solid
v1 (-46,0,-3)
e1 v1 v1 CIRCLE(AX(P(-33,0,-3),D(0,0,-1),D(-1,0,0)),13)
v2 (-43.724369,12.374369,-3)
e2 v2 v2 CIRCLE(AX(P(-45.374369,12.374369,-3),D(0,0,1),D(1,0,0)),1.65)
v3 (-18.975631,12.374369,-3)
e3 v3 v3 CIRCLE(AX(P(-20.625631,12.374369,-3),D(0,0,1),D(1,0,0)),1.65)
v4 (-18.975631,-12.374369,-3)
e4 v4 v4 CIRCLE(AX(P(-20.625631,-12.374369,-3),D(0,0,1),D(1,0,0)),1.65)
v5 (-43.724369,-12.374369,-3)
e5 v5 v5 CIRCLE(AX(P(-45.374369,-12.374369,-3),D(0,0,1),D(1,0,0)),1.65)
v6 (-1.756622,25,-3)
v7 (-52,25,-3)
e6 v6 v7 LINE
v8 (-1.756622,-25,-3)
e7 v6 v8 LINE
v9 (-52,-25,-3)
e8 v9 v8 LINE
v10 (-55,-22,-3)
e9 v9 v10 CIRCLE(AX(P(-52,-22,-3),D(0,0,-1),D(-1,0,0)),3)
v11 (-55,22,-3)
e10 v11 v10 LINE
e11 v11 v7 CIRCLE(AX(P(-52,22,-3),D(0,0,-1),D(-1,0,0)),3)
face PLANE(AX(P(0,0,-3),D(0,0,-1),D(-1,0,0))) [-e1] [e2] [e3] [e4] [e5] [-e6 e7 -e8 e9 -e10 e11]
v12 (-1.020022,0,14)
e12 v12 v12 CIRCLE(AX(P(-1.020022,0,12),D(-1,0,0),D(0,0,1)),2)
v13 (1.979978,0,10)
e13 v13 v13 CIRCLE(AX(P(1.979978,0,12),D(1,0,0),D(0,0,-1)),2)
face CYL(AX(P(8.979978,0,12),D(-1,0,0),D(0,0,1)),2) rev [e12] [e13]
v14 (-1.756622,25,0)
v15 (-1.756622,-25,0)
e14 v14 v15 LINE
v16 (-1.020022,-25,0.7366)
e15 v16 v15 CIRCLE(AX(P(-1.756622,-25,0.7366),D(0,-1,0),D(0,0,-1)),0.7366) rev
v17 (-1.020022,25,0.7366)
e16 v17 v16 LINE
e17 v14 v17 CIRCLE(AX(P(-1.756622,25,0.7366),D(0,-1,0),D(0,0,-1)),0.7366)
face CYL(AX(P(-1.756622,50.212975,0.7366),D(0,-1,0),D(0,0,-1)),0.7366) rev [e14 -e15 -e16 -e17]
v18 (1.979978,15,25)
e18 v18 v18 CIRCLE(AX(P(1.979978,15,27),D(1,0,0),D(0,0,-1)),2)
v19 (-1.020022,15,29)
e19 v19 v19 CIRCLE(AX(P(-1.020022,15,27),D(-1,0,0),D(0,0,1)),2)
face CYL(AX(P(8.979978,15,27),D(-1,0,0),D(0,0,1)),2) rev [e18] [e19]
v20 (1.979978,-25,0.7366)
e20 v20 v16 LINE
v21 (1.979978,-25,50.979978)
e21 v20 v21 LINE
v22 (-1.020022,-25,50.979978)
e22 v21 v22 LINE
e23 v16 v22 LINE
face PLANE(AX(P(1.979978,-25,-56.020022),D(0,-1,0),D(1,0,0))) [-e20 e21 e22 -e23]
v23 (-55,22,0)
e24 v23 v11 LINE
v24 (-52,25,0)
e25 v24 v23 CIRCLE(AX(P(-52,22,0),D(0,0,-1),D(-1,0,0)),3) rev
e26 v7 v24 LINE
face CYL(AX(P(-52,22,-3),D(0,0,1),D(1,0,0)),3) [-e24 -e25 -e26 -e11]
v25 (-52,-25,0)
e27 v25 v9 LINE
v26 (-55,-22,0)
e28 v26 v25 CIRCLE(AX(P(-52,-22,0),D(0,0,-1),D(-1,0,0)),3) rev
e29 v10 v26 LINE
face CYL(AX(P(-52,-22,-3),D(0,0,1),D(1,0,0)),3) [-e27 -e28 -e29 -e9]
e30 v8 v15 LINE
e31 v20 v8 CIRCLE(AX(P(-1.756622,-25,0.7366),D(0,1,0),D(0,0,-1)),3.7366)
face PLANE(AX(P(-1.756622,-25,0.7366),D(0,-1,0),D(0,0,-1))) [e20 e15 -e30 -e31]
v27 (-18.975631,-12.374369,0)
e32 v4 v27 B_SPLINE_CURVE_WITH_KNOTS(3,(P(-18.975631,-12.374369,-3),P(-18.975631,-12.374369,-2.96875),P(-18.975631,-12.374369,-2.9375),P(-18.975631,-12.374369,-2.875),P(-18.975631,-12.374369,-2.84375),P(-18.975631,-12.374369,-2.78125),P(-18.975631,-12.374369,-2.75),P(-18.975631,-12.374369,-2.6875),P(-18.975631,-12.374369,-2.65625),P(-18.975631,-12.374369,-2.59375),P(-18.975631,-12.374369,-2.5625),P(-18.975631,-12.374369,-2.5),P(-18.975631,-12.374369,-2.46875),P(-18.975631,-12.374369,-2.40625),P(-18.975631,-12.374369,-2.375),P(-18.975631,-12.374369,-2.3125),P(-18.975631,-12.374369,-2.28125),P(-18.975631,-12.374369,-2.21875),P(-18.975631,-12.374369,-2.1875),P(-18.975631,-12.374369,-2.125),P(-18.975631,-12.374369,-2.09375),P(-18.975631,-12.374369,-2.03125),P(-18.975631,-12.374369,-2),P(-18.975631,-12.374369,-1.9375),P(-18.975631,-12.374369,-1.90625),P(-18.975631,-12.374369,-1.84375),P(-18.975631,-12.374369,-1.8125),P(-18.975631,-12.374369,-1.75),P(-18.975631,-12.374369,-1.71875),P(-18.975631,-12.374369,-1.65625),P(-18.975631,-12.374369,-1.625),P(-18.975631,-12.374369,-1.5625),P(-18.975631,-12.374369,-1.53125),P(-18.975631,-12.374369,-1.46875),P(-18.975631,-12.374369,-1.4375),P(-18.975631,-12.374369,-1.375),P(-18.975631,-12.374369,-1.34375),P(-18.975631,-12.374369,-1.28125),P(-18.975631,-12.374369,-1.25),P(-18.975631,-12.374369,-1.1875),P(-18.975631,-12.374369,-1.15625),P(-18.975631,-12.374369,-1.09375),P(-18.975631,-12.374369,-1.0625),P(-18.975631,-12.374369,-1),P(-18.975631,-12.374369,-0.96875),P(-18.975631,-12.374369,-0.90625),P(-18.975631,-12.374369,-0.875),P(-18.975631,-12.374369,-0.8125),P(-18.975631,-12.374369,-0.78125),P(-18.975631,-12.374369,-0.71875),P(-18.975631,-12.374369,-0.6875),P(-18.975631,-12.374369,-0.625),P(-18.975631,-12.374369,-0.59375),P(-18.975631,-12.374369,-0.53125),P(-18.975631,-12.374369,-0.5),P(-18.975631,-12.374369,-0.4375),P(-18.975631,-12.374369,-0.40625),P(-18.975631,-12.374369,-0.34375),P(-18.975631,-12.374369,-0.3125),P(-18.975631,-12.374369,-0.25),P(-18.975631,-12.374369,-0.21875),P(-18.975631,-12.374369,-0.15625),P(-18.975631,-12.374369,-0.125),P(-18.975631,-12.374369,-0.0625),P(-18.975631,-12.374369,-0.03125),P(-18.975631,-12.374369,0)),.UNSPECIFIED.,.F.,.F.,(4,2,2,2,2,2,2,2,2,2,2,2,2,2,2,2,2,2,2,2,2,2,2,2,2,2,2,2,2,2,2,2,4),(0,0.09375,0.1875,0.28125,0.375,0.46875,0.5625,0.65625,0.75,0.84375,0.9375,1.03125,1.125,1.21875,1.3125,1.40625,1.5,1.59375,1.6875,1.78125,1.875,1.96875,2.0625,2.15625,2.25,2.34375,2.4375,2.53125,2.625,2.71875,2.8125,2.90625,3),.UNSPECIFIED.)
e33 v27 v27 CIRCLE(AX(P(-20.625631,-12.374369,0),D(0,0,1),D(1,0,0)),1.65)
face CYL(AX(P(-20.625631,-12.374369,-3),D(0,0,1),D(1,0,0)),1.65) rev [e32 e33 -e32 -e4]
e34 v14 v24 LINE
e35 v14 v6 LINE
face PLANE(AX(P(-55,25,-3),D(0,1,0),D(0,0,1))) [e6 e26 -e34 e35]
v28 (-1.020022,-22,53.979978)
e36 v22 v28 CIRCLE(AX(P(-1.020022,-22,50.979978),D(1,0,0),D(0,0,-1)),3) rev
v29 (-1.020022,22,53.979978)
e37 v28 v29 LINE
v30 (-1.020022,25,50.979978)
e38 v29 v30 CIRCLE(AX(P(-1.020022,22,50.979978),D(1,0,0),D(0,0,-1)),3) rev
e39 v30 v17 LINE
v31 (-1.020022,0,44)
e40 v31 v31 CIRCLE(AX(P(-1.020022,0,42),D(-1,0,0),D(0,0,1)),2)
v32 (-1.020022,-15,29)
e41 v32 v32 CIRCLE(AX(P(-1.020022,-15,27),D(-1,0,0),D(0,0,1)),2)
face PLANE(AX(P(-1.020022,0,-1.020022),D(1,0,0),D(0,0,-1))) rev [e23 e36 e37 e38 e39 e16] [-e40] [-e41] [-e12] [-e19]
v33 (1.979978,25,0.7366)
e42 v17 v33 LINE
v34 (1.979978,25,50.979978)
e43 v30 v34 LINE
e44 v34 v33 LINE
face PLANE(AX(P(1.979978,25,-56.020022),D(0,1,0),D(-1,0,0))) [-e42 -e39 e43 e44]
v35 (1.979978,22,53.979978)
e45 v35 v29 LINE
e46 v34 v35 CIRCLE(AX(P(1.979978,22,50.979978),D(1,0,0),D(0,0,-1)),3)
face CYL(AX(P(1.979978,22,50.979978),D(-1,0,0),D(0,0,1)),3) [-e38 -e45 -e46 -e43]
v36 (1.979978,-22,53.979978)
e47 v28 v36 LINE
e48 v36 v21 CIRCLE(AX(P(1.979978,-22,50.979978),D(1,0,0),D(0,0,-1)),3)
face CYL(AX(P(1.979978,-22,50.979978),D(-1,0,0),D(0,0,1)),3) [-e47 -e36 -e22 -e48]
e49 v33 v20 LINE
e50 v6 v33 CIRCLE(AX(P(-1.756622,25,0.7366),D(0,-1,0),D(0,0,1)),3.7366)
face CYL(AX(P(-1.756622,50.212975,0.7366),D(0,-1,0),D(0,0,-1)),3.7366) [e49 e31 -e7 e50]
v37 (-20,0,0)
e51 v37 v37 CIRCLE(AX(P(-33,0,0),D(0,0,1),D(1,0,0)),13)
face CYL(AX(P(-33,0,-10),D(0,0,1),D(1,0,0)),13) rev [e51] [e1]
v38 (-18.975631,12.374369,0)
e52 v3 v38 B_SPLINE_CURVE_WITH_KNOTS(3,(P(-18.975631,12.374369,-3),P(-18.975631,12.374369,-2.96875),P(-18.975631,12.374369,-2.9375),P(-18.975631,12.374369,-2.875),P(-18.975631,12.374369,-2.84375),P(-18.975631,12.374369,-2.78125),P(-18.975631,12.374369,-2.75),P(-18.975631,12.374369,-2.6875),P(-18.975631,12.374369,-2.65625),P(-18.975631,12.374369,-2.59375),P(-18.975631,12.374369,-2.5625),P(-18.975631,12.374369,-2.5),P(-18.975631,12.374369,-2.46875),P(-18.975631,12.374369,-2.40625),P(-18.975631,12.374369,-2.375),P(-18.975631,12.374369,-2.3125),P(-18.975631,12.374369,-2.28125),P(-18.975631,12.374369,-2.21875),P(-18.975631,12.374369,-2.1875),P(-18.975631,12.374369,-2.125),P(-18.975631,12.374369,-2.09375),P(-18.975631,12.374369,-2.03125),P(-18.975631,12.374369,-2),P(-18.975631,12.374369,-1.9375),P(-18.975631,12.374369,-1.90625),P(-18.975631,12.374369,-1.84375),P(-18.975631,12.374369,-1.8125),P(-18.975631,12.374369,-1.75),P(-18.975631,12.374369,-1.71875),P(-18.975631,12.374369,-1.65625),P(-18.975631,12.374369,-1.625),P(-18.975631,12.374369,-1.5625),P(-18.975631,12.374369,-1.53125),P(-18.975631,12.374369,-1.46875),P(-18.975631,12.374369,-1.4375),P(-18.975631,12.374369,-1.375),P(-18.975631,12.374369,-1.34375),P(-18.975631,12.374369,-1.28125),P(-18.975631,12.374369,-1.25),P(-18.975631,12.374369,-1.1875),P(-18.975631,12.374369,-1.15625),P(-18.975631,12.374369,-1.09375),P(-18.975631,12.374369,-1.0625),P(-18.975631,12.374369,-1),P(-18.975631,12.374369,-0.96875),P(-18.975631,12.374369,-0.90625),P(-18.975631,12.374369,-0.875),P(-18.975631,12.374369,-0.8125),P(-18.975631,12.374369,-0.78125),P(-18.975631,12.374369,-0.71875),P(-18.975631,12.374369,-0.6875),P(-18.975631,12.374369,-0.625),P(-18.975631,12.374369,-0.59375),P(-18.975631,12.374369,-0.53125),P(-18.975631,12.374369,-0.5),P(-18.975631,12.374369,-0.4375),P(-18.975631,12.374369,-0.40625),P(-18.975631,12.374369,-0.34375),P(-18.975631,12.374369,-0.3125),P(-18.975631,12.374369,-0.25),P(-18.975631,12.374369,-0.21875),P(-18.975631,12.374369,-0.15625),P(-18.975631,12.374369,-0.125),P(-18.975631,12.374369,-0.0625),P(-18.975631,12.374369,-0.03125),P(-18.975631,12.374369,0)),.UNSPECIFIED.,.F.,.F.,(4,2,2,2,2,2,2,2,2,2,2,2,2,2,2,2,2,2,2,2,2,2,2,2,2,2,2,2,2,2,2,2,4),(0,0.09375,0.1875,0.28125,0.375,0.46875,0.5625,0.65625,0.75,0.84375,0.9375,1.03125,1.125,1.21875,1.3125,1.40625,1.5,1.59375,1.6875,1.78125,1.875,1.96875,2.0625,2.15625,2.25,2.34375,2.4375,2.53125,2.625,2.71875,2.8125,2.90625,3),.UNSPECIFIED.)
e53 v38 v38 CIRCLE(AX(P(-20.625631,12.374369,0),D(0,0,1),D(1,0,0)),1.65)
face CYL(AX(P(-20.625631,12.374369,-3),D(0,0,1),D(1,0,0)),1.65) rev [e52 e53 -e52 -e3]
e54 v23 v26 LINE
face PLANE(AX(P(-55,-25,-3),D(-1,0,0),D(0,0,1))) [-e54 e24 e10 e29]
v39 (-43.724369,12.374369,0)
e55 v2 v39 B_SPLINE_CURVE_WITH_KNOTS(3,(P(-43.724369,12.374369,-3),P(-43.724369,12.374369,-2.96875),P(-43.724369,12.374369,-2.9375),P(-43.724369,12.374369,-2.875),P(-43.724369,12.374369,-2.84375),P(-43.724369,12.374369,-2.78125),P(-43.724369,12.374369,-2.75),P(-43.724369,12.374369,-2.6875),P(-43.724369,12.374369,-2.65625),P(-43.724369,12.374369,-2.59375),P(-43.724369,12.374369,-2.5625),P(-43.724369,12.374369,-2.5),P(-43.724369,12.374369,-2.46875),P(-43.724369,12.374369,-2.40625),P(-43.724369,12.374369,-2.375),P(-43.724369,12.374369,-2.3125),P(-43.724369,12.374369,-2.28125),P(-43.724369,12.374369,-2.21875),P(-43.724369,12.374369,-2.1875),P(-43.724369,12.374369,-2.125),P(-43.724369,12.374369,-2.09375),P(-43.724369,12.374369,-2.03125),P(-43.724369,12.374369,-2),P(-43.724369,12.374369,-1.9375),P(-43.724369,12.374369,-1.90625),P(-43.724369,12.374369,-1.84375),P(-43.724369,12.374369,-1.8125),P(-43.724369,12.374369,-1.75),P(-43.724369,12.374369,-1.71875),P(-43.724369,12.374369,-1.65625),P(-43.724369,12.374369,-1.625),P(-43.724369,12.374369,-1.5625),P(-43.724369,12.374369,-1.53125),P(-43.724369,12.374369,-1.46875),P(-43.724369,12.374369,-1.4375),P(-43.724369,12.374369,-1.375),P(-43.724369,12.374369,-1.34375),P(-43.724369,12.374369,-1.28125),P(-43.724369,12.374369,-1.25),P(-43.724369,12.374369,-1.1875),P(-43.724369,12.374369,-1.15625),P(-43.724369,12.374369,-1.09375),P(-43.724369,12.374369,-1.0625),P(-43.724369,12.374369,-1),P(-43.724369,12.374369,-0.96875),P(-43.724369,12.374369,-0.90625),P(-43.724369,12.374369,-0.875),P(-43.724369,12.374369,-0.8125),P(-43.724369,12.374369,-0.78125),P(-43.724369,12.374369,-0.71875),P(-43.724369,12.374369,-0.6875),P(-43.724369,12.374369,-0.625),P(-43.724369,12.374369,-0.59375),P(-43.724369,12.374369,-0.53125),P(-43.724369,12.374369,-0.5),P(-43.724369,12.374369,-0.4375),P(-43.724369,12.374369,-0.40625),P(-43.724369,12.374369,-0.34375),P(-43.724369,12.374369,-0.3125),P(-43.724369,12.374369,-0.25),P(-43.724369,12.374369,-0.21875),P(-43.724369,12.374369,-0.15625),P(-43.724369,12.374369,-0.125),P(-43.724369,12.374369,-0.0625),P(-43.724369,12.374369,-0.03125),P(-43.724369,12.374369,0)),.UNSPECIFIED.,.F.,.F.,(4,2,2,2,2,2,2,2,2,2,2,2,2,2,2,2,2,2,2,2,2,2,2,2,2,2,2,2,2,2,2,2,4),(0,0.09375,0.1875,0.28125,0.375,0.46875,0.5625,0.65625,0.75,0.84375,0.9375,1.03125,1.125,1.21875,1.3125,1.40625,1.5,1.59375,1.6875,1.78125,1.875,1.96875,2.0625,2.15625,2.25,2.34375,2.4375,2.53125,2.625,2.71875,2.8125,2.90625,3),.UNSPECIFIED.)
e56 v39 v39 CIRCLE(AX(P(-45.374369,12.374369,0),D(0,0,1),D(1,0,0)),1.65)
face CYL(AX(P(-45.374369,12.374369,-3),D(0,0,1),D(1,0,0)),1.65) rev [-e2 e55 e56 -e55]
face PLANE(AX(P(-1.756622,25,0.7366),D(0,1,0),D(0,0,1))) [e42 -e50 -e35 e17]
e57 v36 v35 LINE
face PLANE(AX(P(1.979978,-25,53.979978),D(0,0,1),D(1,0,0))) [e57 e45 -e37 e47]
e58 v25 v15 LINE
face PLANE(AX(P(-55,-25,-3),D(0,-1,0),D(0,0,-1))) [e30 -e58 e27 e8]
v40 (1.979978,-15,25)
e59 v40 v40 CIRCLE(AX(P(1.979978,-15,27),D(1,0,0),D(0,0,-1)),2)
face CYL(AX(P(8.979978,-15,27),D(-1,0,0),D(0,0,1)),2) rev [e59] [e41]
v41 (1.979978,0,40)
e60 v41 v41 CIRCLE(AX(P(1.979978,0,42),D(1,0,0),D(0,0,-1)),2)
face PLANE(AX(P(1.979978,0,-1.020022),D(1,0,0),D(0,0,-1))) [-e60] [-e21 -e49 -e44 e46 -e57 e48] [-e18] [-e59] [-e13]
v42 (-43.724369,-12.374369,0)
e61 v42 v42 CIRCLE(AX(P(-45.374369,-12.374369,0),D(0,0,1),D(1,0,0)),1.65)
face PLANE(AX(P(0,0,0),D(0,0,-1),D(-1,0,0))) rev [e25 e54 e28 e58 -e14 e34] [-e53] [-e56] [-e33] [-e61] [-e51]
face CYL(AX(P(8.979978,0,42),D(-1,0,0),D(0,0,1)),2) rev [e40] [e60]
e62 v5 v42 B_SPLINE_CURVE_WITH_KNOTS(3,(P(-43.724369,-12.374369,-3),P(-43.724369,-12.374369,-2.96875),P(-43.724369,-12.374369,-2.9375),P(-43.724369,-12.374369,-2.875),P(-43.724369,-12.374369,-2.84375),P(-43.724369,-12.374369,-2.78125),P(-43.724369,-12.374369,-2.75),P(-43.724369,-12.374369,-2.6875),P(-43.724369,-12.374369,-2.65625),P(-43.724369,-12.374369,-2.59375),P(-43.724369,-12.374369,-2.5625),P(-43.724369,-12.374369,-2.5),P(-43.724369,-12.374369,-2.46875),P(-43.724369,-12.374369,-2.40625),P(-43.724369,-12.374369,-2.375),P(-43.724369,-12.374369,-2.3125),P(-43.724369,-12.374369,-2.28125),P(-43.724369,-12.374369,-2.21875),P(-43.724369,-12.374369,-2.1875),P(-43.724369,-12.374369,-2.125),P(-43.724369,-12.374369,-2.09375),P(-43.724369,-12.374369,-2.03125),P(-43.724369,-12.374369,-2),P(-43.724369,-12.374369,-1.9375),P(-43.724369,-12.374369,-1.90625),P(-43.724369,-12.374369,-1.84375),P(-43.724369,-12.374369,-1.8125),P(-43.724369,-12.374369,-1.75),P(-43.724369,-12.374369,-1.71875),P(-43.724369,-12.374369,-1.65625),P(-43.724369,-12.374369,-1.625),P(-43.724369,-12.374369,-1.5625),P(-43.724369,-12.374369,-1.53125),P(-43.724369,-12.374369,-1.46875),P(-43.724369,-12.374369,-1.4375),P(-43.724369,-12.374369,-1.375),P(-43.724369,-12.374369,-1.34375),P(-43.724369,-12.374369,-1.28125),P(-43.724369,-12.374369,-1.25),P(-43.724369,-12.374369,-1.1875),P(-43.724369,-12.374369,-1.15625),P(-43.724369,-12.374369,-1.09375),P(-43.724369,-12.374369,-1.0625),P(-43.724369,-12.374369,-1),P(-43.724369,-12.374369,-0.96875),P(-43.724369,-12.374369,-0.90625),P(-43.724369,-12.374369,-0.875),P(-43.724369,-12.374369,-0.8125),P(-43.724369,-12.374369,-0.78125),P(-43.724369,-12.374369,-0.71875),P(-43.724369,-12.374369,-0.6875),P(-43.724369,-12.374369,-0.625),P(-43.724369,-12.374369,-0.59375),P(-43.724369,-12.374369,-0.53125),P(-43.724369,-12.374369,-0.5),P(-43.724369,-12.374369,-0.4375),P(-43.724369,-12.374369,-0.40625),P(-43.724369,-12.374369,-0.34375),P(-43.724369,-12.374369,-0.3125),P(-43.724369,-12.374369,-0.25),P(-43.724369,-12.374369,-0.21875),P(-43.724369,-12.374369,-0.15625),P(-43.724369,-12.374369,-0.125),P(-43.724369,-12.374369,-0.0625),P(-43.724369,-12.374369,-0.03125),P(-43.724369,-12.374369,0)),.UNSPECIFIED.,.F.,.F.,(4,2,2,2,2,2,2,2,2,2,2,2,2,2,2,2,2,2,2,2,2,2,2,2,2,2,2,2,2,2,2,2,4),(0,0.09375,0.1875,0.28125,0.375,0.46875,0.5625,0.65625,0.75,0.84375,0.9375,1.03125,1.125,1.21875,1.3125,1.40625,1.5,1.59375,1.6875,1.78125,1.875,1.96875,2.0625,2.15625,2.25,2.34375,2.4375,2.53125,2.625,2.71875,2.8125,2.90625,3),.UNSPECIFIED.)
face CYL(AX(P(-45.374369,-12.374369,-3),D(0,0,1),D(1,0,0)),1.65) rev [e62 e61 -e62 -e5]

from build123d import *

# Parameters (mm, degrees)
SKETCH_2_W             = 110
SKETCH_2_H             = 50
SM_BASE_FLANGE_1_DEPTH = 3
OTHER_START            = -25
OTHER_1_DEPTH          = 50
OTHER_1_2_DEPTH        = 50
SKETCH_8_R             = 2
CUT_EXTRUDE_1_DEPTH    = 10
FILLET_1_R             = 3
SKETCH_9_R             = 13
CUT_EXTRUDE_2_DEPTH    = 10
SKETCH_10_R            = 1.65
CUT_EXTRUDE_3_DEPTH    = 82.01751709


# Read off the part's stored shape, not the designer's step: 绘制的折弯1
# Sheet-metal steps are written as plain solids
with BuildPart() as part:
    # Sketch 2 → 基体-法兰1 (new body)
    with BuildSketch(Plane.XY):
        Rectangle(SKETCH_2_W, SKETCH_2_H)
    extrude(amount=-SM_BASE_FLANGE_1_DEPTH)

    # Other 1 outline → Other 1 (cut)
    with BuildSketch(Plane(origin=(0, 0, 0), x_dir=(1, 0, 0), z_dir=(0, 1, 0)).offset(OTHER_START)):
        with BuildLine():
            ThreePointArc((-1.756621532, 3), (0.610845469, 2.154295979), (1.906655689, 0))
            Line((1.906655689, 0), (55, 0))
            Line((55, 0), (55, 3))
            Line((55, 3), (-1.756621532, 3))
        make_face()
    extrude(amount=OTHER_1_DEPTH, mode=Mode.SUBTRACT)

    # Other 1 2 outline → Other 1 2 (add)
    with BuildSketch(Plane(origin=(0, 0, 0), x_dir=(1, 0, 0), z_dir=(0, 1, 0)).offset(OTHER_START)):
        with BuildLine():
            Line((-1.020021532, -0.7366), (-1.020021532, -53.979978468))
            Line((-1.020021532, -53.979978468), (1.979978468, -53.979978468))
            Line((1.979978468, -53.979978468), (1.979978468, -0.7366))
            ThreePointArc((1.979978468, -0.7366), (1.961602589, -0.36647982), (1.906655689, 0))
            Line((1.906655689, 0), (-1.756621532, 0))
            ThreePointArc((-1.756621532, 0), (-1.235766677, -0.215745145), (-1.020021532, -0.7366))
        make_face()
    extrude(amount=OTHER_1_2_DEPTH)

    # 草图8 → 切除-拉伸1 (cut)
    with BuildSketch(Plane.ZY.offset(1.020021532)):
        with Locations((12, 0)):
            Circle(SKETCH_8_R)
        with Locations((42, 0)):
            Circle(SKETCH_8_R)
        with Locations((27, 15)):
            Circle(SKETCH_8_R)
        with Locations((27, -15)):
            Circle(SKETCH_8_R)
    extrude(amount=-CUT_EXTRUDE_1_DEPTH, mode=Mode.SUBTRACT)

    # 圆角1
    fillet_1_edges = [part.edges().sort_by_distance(p)[0] for p in [
        (-55, -25, -1.5),
        (-55, 25, -1.5),
        (0.479978468, -25, 53.979978468),
        (0.479978468, 25, 53.979978468),
    ]]
    fillet(fillet_1_edges, radius=FILLET_1_R)

    # 草图9 → 切除-拉伸2 (cut)
    with BuildSketch(Plane.XY):
        with Locations((-33, 0)):
            Circle(SKETCH_9_R)
    extrude(amount=-CUT_EXTRUDE_2_DEPTH, mode=Mode.SUBTRACT)

    # 草图10 → 切除-拉伸3 (cut, through all)
    with BuildSketch(Plane.XY):
        with Locations((-20.625631329, 12.374368671)):
            Circle(SKETCH_10_R)
        with Locations((-20.625631329, -12.374368671)):
            Circle(SKETCH_10_R)
        with Locations((-45.374368671, -12.374368671)):
            Circle(SKETCH_10_R)
        with Locations((-45.374368671, 12.374368671)):
            Circle(SKETCH_10_R)
    extrude(amount=-CUT_EXTRUDE_3_DEPTH, mode=Mode.SUBTRACT)


solid = part.part
